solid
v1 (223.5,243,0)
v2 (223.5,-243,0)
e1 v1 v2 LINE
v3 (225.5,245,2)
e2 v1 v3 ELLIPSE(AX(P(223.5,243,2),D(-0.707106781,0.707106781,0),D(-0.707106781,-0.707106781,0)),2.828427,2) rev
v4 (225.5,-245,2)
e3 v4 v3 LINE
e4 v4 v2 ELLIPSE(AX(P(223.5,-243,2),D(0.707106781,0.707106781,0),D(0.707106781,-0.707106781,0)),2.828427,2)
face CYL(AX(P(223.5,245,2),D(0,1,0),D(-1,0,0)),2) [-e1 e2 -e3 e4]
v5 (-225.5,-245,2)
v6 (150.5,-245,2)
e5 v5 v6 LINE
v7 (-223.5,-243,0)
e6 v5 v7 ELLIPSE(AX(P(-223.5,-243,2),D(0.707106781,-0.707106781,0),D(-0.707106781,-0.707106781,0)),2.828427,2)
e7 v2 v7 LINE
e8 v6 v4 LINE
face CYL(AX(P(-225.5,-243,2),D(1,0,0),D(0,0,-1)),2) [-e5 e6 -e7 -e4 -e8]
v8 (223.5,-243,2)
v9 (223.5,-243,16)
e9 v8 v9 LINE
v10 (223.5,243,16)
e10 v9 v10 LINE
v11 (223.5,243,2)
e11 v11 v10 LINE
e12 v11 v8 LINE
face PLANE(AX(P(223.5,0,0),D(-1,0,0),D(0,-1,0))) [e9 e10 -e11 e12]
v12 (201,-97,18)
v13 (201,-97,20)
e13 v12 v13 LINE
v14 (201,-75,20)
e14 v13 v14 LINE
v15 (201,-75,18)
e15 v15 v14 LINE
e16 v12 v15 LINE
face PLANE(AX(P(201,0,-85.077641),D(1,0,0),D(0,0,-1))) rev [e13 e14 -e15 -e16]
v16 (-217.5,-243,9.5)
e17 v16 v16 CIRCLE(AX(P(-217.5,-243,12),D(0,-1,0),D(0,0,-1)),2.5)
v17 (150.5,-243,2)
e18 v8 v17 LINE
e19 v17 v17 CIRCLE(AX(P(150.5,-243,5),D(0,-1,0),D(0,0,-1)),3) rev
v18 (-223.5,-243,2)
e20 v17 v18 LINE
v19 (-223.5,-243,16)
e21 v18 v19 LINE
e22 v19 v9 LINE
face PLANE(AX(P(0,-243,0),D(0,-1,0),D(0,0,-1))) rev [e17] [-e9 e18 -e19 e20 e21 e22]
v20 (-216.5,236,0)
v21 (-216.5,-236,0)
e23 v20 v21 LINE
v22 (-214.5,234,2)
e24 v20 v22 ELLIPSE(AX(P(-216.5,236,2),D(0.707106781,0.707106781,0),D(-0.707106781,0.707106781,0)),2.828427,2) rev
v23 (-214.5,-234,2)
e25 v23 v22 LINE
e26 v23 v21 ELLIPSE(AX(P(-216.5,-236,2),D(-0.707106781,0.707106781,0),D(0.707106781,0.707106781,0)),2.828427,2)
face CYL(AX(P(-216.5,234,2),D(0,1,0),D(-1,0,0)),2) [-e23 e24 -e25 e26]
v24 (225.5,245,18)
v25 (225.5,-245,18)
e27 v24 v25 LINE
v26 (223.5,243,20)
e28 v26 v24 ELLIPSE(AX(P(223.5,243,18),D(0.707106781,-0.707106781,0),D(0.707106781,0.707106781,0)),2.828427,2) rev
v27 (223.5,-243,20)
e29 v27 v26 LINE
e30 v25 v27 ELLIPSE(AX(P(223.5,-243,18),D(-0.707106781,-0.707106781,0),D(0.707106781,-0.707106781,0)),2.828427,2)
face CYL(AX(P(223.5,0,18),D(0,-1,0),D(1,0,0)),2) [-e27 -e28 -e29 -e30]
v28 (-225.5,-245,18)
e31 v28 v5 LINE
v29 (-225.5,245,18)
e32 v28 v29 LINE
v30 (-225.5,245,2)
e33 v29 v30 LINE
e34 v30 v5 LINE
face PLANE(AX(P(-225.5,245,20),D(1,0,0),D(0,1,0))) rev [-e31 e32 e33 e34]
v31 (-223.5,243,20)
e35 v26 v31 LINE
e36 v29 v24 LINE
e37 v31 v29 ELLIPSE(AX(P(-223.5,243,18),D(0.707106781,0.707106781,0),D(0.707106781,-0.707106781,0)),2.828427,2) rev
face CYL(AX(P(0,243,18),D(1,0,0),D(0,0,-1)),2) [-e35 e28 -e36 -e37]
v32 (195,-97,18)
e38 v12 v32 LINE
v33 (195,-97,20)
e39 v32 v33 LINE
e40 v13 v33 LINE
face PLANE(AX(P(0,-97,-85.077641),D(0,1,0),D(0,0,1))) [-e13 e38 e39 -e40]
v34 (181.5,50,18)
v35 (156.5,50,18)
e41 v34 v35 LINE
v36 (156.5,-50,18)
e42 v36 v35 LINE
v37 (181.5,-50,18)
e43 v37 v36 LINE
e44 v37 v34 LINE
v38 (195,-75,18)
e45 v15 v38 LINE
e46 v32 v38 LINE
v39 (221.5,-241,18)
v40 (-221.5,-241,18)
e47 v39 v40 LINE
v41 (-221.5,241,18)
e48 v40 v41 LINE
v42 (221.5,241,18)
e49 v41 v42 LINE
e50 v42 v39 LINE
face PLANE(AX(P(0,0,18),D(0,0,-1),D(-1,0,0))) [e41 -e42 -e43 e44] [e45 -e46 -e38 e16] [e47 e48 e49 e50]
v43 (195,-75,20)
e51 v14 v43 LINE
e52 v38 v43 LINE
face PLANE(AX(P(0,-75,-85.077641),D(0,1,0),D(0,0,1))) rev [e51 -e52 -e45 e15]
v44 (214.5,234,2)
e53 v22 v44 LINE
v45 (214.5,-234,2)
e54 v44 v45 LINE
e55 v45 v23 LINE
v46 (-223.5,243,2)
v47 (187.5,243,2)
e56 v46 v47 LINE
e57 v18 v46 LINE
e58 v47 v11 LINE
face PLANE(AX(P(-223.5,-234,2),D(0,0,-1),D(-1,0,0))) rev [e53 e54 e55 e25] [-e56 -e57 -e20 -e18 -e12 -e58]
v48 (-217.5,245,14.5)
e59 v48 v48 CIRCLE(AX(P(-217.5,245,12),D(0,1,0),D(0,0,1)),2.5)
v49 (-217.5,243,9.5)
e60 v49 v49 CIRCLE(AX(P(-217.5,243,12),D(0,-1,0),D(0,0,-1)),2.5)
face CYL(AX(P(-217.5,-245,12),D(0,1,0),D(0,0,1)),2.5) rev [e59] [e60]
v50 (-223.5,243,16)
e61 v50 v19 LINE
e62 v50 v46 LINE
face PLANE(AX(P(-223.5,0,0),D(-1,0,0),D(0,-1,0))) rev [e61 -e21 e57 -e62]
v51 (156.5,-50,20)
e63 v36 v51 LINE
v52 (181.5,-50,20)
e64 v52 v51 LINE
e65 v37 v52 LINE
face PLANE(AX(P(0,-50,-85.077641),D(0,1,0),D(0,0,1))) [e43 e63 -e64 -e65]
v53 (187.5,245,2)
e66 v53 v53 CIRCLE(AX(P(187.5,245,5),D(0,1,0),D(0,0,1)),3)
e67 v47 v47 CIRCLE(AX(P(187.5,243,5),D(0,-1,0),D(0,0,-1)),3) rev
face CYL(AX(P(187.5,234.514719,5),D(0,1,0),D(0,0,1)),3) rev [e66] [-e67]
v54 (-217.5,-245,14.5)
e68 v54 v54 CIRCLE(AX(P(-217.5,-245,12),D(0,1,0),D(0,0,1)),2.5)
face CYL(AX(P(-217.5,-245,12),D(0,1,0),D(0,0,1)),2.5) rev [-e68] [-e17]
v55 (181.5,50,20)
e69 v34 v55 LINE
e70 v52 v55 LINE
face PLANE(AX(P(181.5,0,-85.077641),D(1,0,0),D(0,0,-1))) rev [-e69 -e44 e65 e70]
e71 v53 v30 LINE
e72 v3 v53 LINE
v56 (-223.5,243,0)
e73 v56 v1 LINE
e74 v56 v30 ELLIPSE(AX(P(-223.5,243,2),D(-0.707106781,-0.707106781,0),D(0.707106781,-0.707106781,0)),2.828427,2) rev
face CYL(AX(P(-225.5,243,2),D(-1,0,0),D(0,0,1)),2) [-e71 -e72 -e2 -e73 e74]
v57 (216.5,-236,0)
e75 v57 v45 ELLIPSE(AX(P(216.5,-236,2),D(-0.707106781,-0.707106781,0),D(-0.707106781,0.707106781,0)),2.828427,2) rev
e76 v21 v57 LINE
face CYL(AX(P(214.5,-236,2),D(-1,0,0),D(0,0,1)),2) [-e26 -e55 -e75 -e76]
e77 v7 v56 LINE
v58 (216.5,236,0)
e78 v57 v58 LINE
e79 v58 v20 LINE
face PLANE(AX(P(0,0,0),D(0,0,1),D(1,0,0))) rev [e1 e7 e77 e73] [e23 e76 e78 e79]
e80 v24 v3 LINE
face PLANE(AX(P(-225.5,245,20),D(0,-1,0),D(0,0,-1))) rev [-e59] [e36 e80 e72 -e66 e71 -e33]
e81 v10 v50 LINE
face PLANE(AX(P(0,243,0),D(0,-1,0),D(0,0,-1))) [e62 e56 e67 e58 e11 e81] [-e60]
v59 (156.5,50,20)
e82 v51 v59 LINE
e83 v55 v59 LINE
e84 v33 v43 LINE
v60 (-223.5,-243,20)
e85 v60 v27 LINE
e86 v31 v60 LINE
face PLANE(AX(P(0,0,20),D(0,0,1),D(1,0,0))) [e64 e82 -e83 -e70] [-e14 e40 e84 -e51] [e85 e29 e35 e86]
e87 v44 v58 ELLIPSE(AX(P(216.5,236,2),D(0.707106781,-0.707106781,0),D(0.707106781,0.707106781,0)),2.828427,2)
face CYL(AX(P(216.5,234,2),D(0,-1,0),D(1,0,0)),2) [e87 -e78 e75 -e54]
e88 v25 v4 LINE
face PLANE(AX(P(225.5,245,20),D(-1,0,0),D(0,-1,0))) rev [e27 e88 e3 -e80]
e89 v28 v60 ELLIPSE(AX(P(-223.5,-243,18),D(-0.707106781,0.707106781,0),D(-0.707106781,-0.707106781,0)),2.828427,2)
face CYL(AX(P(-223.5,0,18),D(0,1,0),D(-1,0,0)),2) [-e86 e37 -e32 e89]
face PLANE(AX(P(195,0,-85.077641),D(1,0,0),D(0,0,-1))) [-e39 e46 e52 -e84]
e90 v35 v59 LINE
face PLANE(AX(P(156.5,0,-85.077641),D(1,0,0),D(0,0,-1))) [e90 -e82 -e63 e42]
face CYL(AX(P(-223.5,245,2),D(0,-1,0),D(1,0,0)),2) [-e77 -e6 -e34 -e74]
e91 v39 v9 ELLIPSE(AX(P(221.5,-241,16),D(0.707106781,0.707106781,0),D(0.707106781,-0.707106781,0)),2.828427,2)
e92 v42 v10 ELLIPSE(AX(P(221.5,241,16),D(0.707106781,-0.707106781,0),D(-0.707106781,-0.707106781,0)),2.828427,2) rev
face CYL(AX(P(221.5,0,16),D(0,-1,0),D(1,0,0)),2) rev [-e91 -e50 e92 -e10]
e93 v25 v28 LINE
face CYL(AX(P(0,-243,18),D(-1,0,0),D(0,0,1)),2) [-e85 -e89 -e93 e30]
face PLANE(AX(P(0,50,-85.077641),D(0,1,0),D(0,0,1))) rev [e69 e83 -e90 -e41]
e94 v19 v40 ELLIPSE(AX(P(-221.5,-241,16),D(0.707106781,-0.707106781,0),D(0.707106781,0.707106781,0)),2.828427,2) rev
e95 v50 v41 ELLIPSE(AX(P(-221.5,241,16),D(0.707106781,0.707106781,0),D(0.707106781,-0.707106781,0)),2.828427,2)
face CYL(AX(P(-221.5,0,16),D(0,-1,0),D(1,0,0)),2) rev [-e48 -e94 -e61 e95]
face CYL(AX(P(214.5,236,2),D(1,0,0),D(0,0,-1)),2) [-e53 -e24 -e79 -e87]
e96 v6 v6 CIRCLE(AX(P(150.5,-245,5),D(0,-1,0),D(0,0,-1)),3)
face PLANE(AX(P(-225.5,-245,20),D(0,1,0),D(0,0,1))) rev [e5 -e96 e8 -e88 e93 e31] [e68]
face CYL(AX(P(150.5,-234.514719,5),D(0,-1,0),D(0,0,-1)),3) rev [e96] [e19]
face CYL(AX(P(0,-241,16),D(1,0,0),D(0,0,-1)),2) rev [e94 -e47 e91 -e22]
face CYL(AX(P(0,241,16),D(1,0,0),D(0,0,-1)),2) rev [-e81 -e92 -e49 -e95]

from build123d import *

# Parameters (mm, degrees)
SKETCH1_W           = 451
SKETCH1_H           = 490
BOSS_EXTRUDE1_DEPTH = 20
SKETCH2_W           = 429
SKETCH2_H           = 468
CUT_EXTRUDE1_DEPTH  = 18
SKETCH3_W           = 16
SKETCH3_H           = 468
CUT_EXTRUDE2_DEPTH  = 9
SKETCH4_W           = 438
SKETCH4_H           = 16
CUT_EXTRUDE3_DEPTH  = 9
SKETCH5_W           = 16
SKETCH5_H           = 477
CUT_EXTRUDE4_DEPTH  = 9
SKETCH6_W           = 447
SKETCH6_H           = 16
CUT_EXTRUDE5_DEPTH  = 9
FILLET3_R           = 2
FILLET4_R           = 2
SKETCH20_R          = 2.5
CUT_EXTRUDE12_DEPTH = 540.768700463
SKETCH21_R          = 3
CUT_EXTRUDE13_DEPTH = 2
SKETCH22_R          = 3
CUT_EXTRUDE14_DEPTH = 2
SKETCH23_W          = 25
SKETCH23_H          = 100
SKETCH23_W_2        = 6
SKETCH23_H_2        = 22
CUT_EXTRUDE15_DEPTH = 2


with BuildPart() as part:
    # Sketch1 → Boss-Extrude1 (new body)
    with BuildSketch(Plane.XY):
        Rectangle(SKETCH1_W, SKETCH1_H)
    extrude(amount=BOSS_EXTRUDE1_DEPTH)

    # Sketch2 → Cut-Extrude1 (cut)
    with BuildSketch(Plane(origin=(0, 0, 0), x_dir=(-1, 0, 0), z_dir=(0, 0, -1))):
        Rectangle(SKETCH2_W, SKETCH2_H)
    extrude(amount=-CUT_EXTRUDE1_DEPTH, mode=Mode.SUBTRACT)

    # Sketch3 → Cut-Extrude2 (cut)
    with BuildSketch(Plane(origin=(-214.5, 0, 0), x_dir=(0, 0, -1), z_dir=(1, 0, 0))):
        with Locations((-10, 0)):
            Rectangle(SKETCH3_W, SKETCH3_H)
    extrude(amount=-CUT_EXTRUDE2_DEPTH, mode=Mode.SUBTRACT)

    # Sketch4 → Cut-Extrude3 (cut)
    with BuildSketch(Plane(origin=(0, -234, 0), x_dir=(1, 0, 0), z_dir=(0, 1, 0))):
        with Locations((-4.5, -10)):
            Rectangle(SKETCH4_W, SKETCH4_H)
    extrude(amount=-CUT_EXTRUDE3_DEPTH, mode=Mode.SUBTRACT)

    # Sketch5 → Cut-Extrude4 (cut)
    with BuildSketch(Plane.ZY.offset(-214.5)):
        with Locations((10, -4.5)):
            Rectangle(SKETCH5_W, SKETCH5_H)
    extrude(amount=-CUT_EXTRUDE4_DEPTH, mode=Mode.SUBTRACT)

    # Sketch6 → Cut-Extrude5 (cut)
    with BuildSketch(Plane.XZ.offset(-234)):
        with Locations((0, 10)):
            Rectangle(SKETCH6_W, SKETCH6_H)
    extrude(amount=-CUT_EXTRUDE5_DEPTH, mode=Mode.SUBTRACT)

    # Fillet3
    fillet3_edges = [part.edges().sort_by_distance(p)[0] for p in [
        (214.5, 0, 0),
        (225.5, 0, 0),
        (0, 245, 0),
        (0, -245, 0),
        (-225.5, 0, 0),
        (-225.5, 0, 20),
        (0, -245, 20),
        (225.5, 0, 20),
        (0, 245, 20),
    ]]
    fillet(fillet3_edges, radius=FILLET3_R - 0.0001)  # a hair under: the kernel refuses the full size

    # Fillet4
    fillet4_edges = [part.edges().sort_by_distance(p)[0] for p in [
        (0, -243, 18),
        (223.5, 0, 18),
        (0, 243, 18),
        (-223.5, 0, 18),
        (-214.5, 0, 0),
        (0.99995, -234, 0),
        (0.99995, 234, 0),
    ]]
    fillet(fillet4_edges, radius=FILLET4_R - 0.0001)  # a hair under: the kernel refuses the full size

    # Sketch20 → Cut-Extrude12 (cut, through all)
    with BuildSketch(Plane(origin=(0, 245, 0), x_dir=(1, 0, 0), z_dir=(0, 1, 0))):
        with Locations(Location((-217.5, -12, 0), (0, 0, 270))):
            Circle(SKETCH20_R)
    extrude(amount=-CUT_EXTRUDE12_DEPTH, mode=Mode.SUBTRACT)

    # Sketch21 → Cut-Extrude13 (cut)
    with BuildSketch(Plane(origin=(0, 245, 0), x_dir=(1, 0, 0), z_dir=(0, 1, 0))):
        with Locations(Location((187.5, -5, 0), (0, 0, 90))):
            Circle(SKETCH21_R)
    extrude(amount=-CUT_EXTRUDE13_DEPTH, mode=Mode.SUBTRACT)

    # Sketch22 → Cut-Extrude14 (cut)
    with BuildSketch(Plane.XZ.offset(245)):
        with Locations(Location((150.5, 5, 0), (0, 0, 270))):
            Circle(SKETCH22_R)
    extrude(amount=-CUT_EXTRUDE14_DEPTH, mode=Mode.SUBTRACT)

    # Sketch23 → Cut-Extrude15 (cut)
    with BuildSketch(Plane.XY.offset(20)):
        with Locations((169, 0)):
            Rectangle(SKETCH23_W, SKETCH23_H)
        with Locations((198, -86)):
            Rectangle(SKETCH23_W_2, SKETCH23_H_2)
    extrude(amount=-CUT_EXTRUDE15_DEPTH, mode=Mode.SUBTRACT)


solid = part.part
